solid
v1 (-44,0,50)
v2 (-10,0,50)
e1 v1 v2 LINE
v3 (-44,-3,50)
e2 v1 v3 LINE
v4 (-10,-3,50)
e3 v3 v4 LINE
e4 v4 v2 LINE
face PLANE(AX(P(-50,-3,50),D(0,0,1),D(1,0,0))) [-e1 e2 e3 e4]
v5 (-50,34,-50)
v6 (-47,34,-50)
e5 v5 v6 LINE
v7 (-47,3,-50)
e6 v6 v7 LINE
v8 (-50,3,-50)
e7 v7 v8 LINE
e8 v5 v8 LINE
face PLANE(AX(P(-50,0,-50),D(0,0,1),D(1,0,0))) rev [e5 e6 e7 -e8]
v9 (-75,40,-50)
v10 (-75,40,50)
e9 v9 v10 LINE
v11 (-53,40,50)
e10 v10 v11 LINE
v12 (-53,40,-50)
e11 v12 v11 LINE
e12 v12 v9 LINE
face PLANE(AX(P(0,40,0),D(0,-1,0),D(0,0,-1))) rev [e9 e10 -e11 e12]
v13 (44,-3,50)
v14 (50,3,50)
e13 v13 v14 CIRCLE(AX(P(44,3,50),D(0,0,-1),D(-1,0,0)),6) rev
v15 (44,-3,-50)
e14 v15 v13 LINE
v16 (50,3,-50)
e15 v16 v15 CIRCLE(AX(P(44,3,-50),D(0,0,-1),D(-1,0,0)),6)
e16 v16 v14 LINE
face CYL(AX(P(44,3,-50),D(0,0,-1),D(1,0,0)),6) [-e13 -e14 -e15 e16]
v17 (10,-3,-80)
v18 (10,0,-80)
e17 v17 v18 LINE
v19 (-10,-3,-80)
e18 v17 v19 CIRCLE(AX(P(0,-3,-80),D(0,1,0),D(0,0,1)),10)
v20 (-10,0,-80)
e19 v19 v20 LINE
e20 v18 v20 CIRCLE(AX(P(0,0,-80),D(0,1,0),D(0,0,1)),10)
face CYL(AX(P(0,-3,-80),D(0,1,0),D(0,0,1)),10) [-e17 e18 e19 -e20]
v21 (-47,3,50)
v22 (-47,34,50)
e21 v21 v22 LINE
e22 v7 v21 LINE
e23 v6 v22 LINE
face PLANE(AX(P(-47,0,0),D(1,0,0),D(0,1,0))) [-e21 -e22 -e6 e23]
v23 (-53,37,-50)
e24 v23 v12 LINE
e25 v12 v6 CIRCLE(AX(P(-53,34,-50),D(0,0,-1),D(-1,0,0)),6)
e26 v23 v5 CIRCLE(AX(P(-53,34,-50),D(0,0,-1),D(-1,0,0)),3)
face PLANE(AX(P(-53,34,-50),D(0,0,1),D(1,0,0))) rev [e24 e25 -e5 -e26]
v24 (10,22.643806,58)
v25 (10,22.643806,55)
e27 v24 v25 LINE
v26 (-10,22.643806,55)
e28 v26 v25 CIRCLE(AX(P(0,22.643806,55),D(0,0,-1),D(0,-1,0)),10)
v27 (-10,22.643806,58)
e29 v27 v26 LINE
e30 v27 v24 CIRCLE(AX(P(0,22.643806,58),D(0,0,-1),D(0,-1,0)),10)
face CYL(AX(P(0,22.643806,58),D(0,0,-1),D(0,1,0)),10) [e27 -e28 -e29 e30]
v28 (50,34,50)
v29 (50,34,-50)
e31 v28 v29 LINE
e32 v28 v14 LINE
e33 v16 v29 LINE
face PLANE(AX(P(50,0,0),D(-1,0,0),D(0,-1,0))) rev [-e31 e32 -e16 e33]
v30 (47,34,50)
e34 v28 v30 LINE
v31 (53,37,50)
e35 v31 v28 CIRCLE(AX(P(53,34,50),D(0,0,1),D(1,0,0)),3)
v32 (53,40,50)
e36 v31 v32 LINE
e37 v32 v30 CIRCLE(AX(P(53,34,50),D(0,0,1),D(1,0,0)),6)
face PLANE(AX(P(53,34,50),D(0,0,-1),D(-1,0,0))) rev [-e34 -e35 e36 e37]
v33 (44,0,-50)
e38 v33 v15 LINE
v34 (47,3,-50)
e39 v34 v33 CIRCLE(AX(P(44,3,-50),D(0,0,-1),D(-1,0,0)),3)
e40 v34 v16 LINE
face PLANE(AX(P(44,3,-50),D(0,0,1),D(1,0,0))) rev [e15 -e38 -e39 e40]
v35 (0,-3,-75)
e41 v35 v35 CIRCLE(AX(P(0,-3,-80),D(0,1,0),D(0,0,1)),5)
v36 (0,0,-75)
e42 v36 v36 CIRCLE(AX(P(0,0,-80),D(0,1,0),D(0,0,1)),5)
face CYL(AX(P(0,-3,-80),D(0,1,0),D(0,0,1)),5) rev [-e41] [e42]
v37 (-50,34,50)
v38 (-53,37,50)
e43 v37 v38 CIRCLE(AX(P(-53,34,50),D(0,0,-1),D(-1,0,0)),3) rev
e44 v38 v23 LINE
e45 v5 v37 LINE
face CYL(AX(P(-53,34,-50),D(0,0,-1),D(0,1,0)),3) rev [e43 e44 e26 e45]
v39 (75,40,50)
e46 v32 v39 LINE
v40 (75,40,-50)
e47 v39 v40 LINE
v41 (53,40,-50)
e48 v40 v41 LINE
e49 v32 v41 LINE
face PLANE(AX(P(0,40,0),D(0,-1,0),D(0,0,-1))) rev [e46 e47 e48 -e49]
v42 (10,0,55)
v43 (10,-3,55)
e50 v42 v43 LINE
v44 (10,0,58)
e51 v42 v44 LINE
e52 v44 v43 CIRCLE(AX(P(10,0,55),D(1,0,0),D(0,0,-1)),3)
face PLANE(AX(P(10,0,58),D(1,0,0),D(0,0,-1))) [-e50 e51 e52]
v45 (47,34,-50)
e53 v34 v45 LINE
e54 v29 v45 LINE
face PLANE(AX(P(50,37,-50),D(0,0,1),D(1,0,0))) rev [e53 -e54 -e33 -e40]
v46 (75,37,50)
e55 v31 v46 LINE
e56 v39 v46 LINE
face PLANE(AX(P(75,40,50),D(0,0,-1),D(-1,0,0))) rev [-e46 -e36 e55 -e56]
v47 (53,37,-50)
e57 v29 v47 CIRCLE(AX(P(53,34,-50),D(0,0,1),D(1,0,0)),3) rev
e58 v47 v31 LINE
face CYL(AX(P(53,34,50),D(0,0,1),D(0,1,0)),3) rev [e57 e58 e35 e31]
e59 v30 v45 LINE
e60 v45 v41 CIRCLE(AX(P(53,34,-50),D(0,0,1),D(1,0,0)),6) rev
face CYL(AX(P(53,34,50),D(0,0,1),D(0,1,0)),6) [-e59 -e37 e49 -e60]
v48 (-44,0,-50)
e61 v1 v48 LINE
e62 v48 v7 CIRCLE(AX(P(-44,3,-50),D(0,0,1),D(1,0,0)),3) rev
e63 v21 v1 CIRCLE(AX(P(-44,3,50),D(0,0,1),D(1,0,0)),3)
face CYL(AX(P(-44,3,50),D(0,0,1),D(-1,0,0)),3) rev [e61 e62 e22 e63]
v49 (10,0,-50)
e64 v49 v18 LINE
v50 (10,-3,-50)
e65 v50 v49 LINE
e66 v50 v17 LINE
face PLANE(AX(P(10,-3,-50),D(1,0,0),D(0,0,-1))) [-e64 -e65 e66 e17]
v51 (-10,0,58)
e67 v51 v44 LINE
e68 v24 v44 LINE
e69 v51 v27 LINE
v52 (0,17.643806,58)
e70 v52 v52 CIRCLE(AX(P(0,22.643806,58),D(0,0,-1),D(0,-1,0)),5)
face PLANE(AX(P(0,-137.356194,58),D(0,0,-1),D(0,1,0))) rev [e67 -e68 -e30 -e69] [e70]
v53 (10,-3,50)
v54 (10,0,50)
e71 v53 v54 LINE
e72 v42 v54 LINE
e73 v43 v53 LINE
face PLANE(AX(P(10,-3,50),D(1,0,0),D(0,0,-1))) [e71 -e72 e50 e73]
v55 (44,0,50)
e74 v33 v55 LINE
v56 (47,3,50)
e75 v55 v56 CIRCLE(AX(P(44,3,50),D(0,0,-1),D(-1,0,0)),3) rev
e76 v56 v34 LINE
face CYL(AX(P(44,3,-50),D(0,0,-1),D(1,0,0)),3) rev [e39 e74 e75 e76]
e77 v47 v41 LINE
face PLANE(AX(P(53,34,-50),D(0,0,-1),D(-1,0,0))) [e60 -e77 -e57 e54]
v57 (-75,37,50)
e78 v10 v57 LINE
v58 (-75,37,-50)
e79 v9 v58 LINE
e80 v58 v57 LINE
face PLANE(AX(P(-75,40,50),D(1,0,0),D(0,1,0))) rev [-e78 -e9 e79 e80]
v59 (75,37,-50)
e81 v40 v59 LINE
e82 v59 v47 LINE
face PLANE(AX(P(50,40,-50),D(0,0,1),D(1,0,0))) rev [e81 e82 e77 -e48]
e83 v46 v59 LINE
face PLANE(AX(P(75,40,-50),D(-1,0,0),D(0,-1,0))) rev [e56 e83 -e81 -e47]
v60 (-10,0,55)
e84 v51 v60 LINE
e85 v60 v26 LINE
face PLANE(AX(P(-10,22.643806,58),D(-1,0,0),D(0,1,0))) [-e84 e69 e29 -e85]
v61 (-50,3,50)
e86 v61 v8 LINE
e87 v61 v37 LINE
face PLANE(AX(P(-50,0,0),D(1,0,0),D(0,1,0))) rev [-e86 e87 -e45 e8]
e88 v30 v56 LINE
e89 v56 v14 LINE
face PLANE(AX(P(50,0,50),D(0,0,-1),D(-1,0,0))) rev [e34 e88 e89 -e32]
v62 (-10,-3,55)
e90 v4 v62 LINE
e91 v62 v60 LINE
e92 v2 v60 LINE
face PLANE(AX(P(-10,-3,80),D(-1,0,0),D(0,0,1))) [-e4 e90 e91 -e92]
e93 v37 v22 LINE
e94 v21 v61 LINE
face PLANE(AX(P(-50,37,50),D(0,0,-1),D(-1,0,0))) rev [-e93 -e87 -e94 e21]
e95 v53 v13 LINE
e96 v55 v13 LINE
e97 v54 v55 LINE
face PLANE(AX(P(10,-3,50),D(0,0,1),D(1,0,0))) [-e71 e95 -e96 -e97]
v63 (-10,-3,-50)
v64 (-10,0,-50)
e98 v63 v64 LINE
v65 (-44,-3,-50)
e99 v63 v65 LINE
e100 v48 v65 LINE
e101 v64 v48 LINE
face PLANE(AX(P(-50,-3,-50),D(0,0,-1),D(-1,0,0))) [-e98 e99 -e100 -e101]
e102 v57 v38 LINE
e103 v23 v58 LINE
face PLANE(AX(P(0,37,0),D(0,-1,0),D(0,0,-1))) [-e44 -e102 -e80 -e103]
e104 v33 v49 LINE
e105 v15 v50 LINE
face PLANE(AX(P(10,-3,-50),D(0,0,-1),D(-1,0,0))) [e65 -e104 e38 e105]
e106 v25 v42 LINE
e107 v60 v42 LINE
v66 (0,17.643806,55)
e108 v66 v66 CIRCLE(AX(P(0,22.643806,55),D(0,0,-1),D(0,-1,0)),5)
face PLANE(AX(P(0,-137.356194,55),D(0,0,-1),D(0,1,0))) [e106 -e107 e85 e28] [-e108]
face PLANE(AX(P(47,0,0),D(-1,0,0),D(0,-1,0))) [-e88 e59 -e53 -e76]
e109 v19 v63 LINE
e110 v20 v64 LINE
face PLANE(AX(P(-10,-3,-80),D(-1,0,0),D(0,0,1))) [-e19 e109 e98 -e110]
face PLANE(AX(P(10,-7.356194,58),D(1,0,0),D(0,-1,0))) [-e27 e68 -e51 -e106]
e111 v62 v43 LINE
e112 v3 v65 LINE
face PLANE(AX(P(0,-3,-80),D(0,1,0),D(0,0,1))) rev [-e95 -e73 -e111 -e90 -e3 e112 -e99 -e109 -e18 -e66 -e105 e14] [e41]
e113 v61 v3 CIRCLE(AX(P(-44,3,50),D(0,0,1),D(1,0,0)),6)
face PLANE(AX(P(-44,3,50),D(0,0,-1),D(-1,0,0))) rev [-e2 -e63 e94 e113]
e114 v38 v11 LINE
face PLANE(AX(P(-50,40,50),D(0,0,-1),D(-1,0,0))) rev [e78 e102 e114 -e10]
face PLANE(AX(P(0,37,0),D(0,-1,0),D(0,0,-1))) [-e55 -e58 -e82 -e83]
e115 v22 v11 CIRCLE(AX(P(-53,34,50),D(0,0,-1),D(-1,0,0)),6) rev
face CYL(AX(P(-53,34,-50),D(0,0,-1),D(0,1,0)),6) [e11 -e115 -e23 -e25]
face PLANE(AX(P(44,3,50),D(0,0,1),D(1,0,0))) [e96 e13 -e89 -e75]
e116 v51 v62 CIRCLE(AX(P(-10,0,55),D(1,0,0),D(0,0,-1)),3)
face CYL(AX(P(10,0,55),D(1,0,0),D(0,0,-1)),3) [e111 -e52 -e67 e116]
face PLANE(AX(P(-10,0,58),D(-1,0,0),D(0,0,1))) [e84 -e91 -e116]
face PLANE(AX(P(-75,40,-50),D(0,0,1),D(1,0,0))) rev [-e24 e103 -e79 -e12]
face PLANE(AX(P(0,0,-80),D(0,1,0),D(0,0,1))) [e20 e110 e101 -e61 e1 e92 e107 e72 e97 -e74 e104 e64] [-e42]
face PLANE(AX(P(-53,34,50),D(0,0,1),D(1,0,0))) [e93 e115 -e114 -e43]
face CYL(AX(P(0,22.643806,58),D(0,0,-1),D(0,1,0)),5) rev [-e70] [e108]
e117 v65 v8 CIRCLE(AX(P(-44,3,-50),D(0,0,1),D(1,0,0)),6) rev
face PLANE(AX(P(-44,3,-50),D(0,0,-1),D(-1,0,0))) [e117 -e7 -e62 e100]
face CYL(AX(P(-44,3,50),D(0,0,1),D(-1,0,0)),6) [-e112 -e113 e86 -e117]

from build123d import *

# Parameters (mm, degrees)
SKETCH1_R                      = 5
BASE_FLANGE1_DEPTH             = 3
EDGE_FLANGE1_STRIP_W           = 18
EDGE_FLANGE1_STRIP_H           = 3
EDGE_FLANGE1_STRIP_CUT_DEPTH   = 100
EDGE_FLANGE1_STRIP_2_W         = 18
EDGE_FLANGE1_STRIP_2_H         = 3
EDGE_FLANGE1_STRIP_CUT_2_DEPTH = 100
EDGE_FLANGE1_DEPTH             = 100
EDGE_FLANGE1_BEND_DEPTH        = 100
EDGE_FLANGE2_STRIP_W           = 18
EDGE_FLANGE2_STRIP_H           = 3
EDGE_FLANGE2_STRIP_CUT_DEPTH   = 100
EDGE_FLANGE2_STRIP_2_W         = 18
EDGE_FLANGE2_STRIP_2_H         = 3
EDGE_FLANGE2_STRIP_CUT_2_DEPTH = 100
EDGE_FLANGE2_DEPTH             = 100
EDGE_FLANGE2_BEND_DEPTH        = 100
SKETCHED_START                 = 58
SKETCHED_BEND1_OUTLINE_W       = 20
SKETCHED_BEND1_OUTLINE_H       = 3
SKETCHED_BEND1_DEPTH           = 33
SKETCHED_START_2               = 55
SKETCHED_BEND1_2_OUTLINE_R     = 5
SKETCHED_BEND1_2_DEPTH         = 3
SKETCHED_START_3               = -11
SKETCHED_BEND1_3_DEPTH         = 22


with BuildPart() as part:
    # Base-Flange1: sheet metal written as solids
    # Sketch1 → Base-Flange1 (new body)
    with BuildSketch(Plane(origin=(0, 0, 0), x_dir=(1, 0, 0), z_dir=(0, 1, 0))):
        with BuildLine():
            Line((10, 50), (10, 80))
            ThreePointArc((10, 80), (0, 90), (-10, 80))
            Line((-10, 80), (-10, 50))
            Line((-10, 50), (-50, 50))
            Line((-50, 50), (-50, -50))
            Line((-50, -50), (-10, -50))
            Line((-10, -50), (-10, -80))
            ThreePointArc((-10, -80), (0, -90), (10, -80))
            Line((10, -80), (10, -50))
            Line((10, -50), (50, -50))
            Line((50, -50), (50, 50))
            Line((50, 50), (10, 50))
        make_face()
        with Locations(Location((0, 80, 0), (0, 0, 270))):
            Circle(SKETCH1_R, mode=Mode.SUBTRACT)
        with Locations(Location((0, -80, 0), (0, 0, 90))):
            Circle(SKETCH1_R, mode=Mode.SUBTRACT)
    extrude(amount=-BASE_FLANGE1_DEPTH)

    # Edge-Flange1: sheet metal written as solids
    # Edge-Flange1 strip (on a plane across the edge) → Edge-Flange1 strip cut (cut)
    with BuildSketch(Plane(origin=(50, 0, 50), x_dir=(-1, 0, 0), z_dir=(0, 0, -1))):
        with Locations((-3, -1.5)):
            Rectangle(EDGE_FLANGE1_STRIP_W, EDGE_FLANGE1_STRIP_H)
    extrude(amount=EDGE_FLANGE1_STRIP_CUT_DEPTH, mode=Mode.SUBTRACT)

    # Edge-Flange1 strip 2 (on a plane across the edge) → Edge-Flange1 strip cut 2 (cut)
    with BuildSketch(Plane(origin=(-50, 0, -50), x_dir=(1, 0, 0), z_dir=(0, 0, 1))):
        with Locations((-3, -1.5)):
            Rectangle(EDGE_FLANGE1_STRIP_2_W, EDGE_FLANGE1_STRIP_2_H)
    extrude(amount=EDGE_FLANGE1_STRIP_CUT_2_DEPTH, mode=Mode.SUBTRACT)

    # Edge-Flange1 section (on a plane across the edge) → Edge-Flange1 (add)
    with BuildSketch(Plane(origin=(50, 0, 50), x_dir=(-1, 0, 0), z_dir=(0, 0, -1))):
        with BuildLine():
            Line((0, 3), (0, 37))
            Line((0, 37), (3, 37))
            Line((3, 37), (3, 3))
            ThreePointArc((3, 3), (3.878679656, 0.878679656), (6, 0))
            Line((6, 0), (6, -3))
            ThreePointArc((6, -3), (1.757359313, -1.242640687), (0, 3))
        make_face()
    extrude(amount=EDGE_FLANGE1_DEPTH)

    # Edge-Flange1 section 2 (on a plane across the edge) → Edge-Flange1 bend (add)
    with BuildSketch(Plane(origin=(-50, 0, -50), x_dir=(1, 0, 0), z_dir=(0, 0, 1))):
        with BuildLine():
            Line((0, 3), (0, 37))
            Line((0, 37), (3, 37))
            Line((3, 37), (3, 3))
            ThreePointArc((3, 3), (3.878679656, 0.878679656), (6, 0))
            Line((6, 0), (6, -3))
            ThreePointArc((6, -3), (1.757359313, -1.242640687), (0, 3))
        make_face()
    extrude(amount=EDGE_FLANGE1_BEND_DEPTH)

    # Edge-Flange2: sheet metal written as solids
    # Edge-Flange2 strip (on a plane across the edge) → Edge-Flange2 strip cut (cut)
    with BuildSketch(Plane(origin=(-50, 37, 50), x_dir=(0, -1, 0), z_dir=(0, 0, -1))):
        with Locations((-6, -1.5)):
            Rectangle(EDGE_FLANGE2_STRIP_W, EDGE_FLANGE2_STRIP_H)
    extrude(amount=EDGE_FLANGE2_STRIP_CUT_DEPTH, mode=Mode.SUBTRACT)

    # Edge-Flange2 strip 2 (on a plane across the edge) → Edge-Flange2 strip cut 2 (cut)
    with BuildSketch(Plane(origin=(50, 37, -50), x_dir=(0, -1, 0), z_dir=(0, 0, 1))):
        with Locations((-6, -1.5)):
            Rectangle(EDGE_FLANGE2_STRIP_2_W, EDGE_FLANGE2_STRIP_2_H)
    extrude(amount=EDGE_FLANGE2_STRIP_CUT_2_DEPTH, mode=Mode.SUBTRACT)

    # Edge-Flange2 section (on a plane across the edge) → Edge-Flange2 (add)
    with BuildSketch(Plane(origin=(-50, 37, 50), x_dir=(0, -1, 0), z_dir=(0, 0, -1))):
        with BuildLine():
            Line((-3, 3), (-3, 25))
            Line((-3, 25), (0, 25))
            Line((0, 25), (0, 3))
            ThreePointArc((0, 3), (0.878679656, 0.878679656), (3, 0))
            Line((3, 0), (3, -3))
            ThreePointArc((3, -3), (-1.242640687, -1.242640687), (-3, 3))
        make_face()
    extrude(amount=EDGE_FLANGE2_DEPTH)

    # Edge-Flange2 section 2 (on a plane across the edge) → Edge-Flange2 bend (add)
    with BuildSketch(Plane(origin=(50, 37, -50), x_dir=(0, -1, 0), z_dir=(0, 0, 1))):
        with BuildLine():
            Line((-3, 3), (-3, 25))
            Line((-3, 25), (0, 25))
            Line((0, 25), (0, 3))
            ThreePointArc((0, 3), (0.878679656, 0.878679656), (3, 0))
            Line((3, 0), (3, -3))
            ThreePointArc((3, -3), (-1.242640687, -1.242640687), (-3, 3))
        make_face()
    extrude(amount=EDGE_FLANGE2_BEND_DEPTH)

    # Sketched Bend1: read off the stored shape, not the designer's step
    # Sketched Bend1 outline → Sketched Bend1 (cut)
    with BuildSketch(Plane.XY.offset(SKETCHED_START)):
        with Locations((0, -1.5)):
            Rectangle(SKETCHED_BEND1_OUTLINE_W, SKETCHED_BEND1_OUTLINE_H)
    extrude(amount=SKETCHED_BEND1_DEPTH, mode=Mode.SUBTRACT)

    # Sketched Bend1 2 outline → Sketched Bend1 2 (add)
    with BuildSketch(Plane.XY.offset(SKETCHED_START_2)):
        with BuildLine():
            ThreePointArc((10, 22.64380551), (0, 32.64380551), (-10, 22.64380551))
            Line((-10, 22.64380551), (-10, 0))
            Line((-10, 0), (10, 0))
            Line((10, 0), (10, 22.64380551))
        make_face()
        with Locations((0, 22.64380551)):
            Circle(SKETCHED_BEND1_2_OUTLINE_R, mode=Mode.SUBTRACT)
    extrude(amount=SKETCHED_BEND1_2_DEPTH)

    # Sketched Bend1 3 outline → Sketched Bend1 3 (cut)
    with BuildSketch(Plane.YZ.offset(SKETCHED_START_3)):
        with BuildLine():
            ThreePointArc((-3, 55), (-2.121320344, 57.121320344), (0, 58))
            Line((0, 58), (-3, 58))
            Line((-3, 58), (-3, 55))
        make_face()
    extrude(amount=SKETCHED_BEND1_3_DEPTH, mode=Mode.SUBTRACT)


solid = part.part
